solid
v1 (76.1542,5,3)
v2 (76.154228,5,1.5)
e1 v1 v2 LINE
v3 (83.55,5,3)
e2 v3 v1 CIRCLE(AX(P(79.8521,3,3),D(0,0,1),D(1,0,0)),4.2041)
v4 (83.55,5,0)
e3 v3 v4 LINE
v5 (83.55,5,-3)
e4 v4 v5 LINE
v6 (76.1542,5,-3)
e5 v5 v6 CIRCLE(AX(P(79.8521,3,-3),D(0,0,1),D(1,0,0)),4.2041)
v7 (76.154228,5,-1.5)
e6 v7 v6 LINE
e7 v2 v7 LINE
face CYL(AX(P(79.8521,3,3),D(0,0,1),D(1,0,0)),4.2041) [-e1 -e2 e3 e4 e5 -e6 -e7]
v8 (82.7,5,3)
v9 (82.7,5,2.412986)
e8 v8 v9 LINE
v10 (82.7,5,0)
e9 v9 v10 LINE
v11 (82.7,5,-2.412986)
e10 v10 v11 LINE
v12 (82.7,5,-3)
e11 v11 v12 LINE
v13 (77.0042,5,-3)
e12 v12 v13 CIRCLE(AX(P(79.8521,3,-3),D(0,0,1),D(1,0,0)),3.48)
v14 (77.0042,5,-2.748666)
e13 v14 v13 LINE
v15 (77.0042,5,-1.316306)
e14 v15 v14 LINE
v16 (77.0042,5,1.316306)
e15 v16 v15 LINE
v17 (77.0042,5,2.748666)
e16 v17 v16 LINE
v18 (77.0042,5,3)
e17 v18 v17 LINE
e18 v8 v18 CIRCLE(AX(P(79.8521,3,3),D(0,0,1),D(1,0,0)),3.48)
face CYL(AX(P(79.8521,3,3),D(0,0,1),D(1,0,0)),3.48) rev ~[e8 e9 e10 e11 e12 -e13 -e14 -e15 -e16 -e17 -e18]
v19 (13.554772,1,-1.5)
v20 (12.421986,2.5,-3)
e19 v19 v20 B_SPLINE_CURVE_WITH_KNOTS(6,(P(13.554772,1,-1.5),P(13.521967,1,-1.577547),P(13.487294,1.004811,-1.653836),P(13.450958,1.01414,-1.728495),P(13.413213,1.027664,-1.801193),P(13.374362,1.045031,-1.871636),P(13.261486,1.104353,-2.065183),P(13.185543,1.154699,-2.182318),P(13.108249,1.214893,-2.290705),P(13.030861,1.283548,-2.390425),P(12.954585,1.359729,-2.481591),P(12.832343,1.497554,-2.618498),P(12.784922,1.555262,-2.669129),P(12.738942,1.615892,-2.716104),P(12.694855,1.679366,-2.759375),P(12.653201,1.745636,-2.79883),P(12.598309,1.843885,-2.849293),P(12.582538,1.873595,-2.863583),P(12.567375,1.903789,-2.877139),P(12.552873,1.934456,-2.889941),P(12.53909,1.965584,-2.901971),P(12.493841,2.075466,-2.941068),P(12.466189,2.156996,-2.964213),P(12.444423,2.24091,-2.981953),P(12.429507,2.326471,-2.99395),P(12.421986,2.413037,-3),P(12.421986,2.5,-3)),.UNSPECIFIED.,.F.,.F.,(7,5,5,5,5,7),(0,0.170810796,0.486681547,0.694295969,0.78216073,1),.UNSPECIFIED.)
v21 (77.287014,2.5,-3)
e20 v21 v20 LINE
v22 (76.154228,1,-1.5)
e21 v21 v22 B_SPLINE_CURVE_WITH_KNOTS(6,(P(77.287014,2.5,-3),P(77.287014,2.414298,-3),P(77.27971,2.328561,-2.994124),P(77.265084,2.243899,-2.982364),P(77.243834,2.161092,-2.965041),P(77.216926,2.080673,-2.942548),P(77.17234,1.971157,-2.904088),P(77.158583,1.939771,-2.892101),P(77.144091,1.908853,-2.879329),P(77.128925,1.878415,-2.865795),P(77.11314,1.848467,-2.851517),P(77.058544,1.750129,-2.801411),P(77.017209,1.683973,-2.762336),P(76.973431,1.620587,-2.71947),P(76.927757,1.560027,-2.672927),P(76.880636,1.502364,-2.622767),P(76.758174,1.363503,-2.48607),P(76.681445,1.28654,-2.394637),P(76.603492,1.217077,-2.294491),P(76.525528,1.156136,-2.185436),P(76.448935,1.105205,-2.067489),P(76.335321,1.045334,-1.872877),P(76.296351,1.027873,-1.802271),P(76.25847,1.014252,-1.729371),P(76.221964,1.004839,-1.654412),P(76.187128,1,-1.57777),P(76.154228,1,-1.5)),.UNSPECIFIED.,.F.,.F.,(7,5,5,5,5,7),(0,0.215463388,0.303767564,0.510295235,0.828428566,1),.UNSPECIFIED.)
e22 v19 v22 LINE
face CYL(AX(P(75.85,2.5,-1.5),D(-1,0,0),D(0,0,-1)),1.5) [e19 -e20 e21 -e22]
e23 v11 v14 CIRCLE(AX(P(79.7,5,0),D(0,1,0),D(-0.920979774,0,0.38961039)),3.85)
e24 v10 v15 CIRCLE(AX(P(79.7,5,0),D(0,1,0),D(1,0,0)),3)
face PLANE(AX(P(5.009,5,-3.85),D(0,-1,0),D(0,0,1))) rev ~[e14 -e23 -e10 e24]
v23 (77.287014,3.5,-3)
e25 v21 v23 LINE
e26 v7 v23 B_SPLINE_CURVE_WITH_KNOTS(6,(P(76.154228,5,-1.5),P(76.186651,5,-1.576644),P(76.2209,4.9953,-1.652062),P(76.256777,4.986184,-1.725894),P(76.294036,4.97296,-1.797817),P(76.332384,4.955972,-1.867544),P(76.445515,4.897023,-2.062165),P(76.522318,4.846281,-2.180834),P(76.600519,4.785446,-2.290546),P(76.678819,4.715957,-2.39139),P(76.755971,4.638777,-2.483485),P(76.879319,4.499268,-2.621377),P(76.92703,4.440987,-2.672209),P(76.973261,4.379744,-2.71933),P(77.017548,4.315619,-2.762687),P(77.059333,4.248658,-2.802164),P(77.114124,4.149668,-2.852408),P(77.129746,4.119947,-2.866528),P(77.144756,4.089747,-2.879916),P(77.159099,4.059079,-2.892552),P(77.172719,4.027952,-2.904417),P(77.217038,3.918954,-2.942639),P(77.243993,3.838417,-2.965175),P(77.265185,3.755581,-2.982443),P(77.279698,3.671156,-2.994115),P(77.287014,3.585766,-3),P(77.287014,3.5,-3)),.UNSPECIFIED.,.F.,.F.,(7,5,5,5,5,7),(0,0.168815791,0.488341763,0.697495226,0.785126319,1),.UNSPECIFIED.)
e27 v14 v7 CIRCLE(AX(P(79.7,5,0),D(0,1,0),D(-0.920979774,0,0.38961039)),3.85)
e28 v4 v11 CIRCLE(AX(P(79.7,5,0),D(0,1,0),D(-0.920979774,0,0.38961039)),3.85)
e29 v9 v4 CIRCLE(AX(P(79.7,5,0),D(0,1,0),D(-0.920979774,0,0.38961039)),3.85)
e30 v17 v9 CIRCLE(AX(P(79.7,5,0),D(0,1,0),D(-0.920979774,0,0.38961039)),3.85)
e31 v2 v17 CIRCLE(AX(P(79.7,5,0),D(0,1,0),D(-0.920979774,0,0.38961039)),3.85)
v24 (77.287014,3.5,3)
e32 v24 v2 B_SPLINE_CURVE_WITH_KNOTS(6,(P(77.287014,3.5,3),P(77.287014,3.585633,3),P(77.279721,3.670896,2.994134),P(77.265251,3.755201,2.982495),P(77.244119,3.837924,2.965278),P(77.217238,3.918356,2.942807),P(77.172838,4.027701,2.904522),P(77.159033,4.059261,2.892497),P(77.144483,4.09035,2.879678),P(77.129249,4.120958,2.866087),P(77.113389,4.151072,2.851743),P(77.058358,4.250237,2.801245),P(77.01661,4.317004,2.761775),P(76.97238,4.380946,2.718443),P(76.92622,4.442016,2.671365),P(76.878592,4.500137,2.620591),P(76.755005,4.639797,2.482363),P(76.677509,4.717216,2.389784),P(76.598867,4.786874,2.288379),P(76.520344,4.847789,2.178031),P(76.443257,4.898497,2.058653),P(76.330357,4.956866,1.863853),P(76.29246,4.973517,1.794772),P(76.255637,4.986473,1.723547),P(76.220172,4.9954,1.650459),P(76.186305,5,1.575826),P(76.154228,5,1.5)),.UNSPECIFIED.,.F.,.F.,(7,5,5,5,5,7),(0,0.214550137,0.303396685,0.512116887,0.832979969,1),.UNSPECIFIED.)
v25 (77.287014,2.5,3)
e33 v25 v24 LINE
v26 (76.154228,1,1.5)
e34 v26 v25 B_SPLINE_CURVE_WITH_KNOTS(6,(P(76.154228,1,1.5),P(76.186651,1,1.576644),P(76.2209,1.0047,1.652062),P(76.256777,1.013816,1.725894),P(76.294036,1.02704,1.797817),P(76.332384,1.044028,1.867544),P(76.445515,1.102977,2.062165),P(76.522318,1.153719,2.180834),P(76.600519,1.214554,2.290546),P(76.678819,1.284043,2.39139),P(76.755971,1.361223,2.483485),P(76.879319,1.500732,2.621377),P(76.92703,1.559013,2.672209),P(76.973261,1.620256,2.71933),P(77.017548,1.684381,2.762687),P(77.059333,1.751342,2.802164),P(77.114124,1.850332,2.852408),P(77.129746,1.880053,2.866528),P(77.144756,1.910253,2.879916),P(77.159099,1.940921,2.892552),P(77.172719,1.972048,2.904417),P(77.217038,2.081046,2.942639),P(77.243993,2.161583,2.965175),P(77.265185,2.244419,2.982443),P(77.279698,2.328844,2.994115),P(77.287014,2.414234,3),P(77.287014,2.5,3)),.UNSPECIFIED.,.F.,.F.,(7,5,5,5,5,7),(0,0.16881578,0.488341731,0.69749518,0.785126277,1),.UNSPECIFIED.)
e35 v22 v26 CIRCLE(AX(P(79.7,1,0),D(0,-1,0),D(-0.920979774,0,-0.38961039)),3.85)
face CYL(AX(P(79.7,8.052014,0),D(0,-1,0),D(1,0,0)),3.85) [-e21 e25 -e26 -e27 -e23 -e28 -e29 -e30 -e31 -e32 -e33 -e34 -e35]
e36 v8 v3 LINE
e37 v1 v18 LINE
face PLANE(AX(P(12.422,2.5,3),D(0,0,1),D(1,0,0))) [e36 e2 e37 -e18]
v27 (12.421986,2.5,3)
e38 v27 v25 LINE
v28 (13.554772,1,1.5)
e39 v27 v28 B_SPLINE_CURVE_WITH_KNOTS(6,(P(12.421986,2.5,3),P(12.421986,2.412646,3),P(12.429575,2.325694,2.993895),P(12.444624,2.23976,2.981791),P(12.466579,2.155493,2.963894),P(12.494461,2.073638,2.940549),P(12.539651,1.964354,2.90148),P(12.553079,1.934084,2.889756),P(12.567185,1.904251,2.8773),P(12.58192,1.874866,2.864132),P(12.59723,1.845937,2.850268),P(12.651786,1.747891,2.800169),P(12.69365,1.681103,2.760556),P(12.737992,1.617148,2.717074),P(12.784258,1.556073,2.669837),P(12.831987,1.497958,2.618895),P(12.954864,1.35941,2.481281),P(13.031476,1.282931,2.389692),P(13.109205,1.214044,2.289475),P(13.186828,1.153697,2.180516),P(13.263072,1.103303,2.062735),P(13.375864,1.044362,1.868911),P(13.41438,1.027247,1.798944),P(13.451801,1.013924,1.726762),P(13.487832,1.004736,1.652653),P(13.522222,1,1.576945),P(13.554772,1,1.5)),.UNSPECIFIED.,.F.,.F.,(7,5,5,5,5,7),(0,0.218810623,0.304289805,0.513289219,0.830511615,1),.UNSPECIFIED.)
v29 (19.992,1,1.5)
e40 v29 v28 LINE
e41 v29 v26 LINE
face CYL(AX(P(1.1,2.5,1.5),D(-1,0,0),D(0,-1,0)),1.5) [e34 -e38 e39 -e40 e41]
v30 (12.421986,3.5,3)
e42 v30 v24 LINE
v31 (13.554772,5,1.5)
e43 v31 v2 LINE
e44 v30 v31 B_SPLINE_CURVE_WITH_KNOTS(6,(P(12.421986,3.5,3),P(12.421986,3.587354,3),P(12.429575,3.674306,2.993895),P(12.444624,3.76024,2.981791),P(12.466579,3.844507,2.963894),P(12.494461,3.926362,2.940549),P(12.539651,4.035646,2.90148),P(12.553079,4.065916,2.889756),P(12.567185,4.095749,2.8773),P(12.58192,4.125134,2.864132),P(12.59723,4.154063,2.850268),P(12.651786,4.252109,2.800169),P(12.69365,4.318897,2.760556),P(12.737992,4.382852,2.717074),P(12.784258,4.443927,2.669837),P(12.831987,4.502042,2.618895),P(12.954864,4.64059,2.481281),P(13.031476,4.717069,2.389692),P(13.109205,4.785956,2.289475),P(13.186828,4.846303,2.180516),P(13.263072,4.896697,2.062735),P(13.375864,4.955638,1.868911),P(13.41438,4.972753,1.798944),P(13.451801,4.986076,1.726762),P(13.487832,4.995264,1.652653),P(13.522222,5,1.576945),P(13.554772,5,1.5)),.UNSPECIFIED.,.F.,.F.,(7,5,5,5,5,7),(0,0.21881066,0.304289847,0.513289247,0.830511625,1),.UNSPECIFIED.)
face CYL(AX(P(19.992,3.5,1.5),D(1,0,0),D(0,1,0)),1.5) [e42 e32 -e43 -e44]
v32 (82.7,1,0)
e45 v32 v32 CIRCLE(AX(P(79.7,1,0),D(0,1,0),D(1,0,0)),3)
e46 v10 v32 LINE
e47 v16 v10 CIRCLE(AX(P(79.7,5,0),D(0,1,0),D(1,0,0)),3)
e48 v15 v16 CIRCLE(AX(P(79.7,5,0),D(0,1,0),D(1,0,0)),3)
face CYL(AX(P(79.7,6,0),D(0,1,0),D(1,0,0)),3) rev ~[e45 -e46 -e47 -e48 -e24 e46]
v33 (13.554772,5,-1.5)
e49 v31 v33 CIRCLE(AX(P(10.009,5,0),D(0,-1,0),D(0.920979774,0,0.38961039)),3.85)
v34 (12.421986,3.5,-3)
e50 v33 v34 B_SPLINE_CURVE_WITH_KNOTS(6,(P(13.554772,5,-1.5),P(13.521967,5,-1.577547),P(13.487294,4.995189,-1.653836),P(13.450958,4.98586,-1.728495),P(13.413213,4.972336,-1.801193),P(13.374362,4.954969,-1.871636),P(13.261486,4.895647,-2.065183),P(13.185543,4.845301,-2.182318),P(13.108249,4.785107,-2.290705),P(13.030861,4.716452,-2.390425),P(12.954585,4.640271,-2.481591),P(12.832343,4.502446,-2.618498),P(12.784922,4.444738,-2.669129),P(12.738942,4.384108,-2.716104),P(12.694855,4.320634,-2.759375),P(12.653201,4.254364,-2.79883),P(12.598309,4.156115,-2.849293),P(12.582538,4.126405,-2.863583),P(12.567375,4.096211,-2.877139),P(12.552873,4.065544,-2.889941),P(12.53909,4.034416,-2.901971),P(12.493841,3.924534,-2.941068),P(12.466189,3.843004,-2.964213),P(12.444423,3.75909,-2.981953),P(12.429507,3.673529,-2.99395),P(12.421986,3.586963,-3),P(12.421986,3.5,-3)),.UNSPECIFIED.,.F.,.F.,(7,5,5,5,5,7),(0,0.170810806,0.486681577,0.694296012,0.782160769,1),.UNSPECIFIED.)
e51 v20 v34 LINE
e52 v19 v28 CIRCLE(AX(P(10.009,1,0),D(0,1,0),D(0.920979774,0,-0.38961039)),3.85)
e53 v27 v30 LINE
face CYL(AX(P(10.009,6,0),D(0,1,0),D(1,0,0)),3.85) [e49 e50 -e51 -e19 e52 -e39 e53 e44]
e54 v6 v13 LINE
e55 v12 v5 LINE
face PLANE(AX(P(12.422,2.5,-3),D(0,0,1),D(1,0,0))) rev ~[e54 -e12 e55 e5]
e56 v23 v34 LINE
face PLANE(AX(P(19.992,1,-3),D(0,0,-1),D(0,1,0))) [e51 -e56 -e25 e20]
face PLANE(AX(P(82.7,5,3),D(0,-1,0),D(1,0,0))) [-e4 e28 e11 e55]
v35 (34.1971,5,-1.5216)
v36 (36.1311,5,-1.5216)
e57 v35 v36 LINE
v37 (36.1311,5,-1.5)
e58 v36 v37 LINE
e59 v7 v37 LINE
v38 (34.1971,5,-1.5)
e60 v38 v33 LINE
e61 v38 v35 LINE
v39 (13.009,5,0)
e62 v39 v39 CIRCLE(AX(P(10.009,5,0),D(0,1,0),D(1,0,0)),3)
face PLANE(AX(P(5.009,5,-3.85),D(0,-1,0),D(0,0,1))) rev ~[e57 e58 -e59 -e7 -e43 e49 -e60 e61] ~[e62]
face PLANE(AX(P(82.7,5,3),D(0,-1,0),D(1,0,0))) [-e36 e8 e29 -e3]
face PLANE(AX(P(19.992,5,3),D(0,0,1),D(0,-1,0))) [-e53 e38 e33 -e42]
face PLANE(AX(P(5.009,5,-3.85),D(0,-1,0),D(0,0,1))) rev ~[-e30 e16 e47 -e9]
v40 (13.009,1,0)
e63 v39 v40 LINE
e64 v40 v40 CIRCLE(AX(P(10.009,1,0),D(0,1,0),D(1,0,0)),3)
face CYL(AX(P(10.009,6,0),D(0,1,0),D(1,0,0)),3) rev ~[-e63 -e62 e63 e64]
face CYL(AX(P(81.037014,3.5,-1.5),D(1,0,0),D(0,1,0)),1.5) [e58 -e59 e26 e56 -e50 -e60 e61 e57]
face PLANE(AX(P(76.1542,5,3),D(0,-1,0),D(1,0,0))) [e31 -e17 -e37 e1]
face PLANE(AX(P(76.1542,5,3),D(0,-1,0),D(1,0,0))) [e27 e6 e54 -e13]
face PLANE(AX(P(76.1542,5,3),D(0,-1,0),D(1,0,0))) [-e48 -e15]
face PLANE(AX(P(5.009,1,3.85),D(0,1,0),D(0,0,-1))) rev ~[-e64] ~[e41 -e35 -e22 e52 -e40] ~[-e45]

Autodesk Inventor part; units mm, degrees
ref_plane "YZ Plane" through (0, 0, 0) normal (1, 0, 0) x (0, 1, 0)
ref_plane "XZ Plane" through (0, 0, 0) normal (0, 1, 0) x (-1, 0, 0)
ref_plane "XY Plane" through (0, 0, 0) normal (0, 0, 1) x (1, 0, 0)
sketch "Sketch1" plane through (0, 0, 0) normal (0, 1, 0) x (-1, 0, 0)
  point P0 (0, 0)
sketch "Sketch2" plane through (0, 0, 0) normal (0, 1, 0) x (-1, 0, 0)
  circle A0 centre (0, 0) radius 3.85
  dimension "d0" = 7.7
extrude "Extrusion1" add sketch "Sketch2" along normal blind 6
sketch "Sketch3" plane through (0, 6, 0) normal (0, 1, 0) x (1, 0, 0)
  circle A0 centre (0, 0) radius 1
  dimension "d3" = 2
extrude "Extrusion2" cut sketch "Sketch3" against normal through all
sketch "Sketch4" plane through (0, 0, 0) normal (0, -1, 0) x (1, 0, 0)
  circle A0 centre (0, 0) radius 3.85 projected
  line L0 (0, 3.85) -> (3.85, 3.85)
  line L1 (3.85, 3.85) -> (3.85, -3.85)
  line L2 (3.85, -3.85) -> (0, -3.85)
  line L3 (3.85, 3.85) -> (4.85, 3.85)
  line L4 (4.85, 3.85) -> (4.85, -3.85)
  line L5 (4.85, -3.85) -> (3.85, -3.85)
  line L6 (3.85, -3.85) -> (3.85, 3.85)
  line L7 (4.85, 3.85) -> (4.85, 3)
  line L8 (4.85, -3.85) -> (4.85, -3)
  line L9 (4.85, 3) -> (3.85, 3)
  line L10 (3.85, 3) -> (3.85, -3)
  line L11 (3.85, -3) -> (4.85, -3)
  line L12 (4.85, -3) -> (4.85, 3)
  point P0 (3.85, -3)
  dimension "d6" = 1
  dimension "d7" = 0.85
  dimension "d8" = 0.85
extrude "Extrusion3" add sketch "Sketch4" against normal blind 6 contours L1 L9 L4 L11
sketch "Sketch5" plane through (4.85, 0, 3) normal (1, 0, 0) x (0, 0, -1)
  line L0 (6.85, 0) -> (-0.85, 0) projected
  line L1 (6, 0) -> (6, 6) projected
  line L2 (0.0003, 0) -> (6, 0)
  line L3 (6, 0) -> (6, 1)
  line L4 (6, 1) -> (0.0003, 1)
  line L5 (0.0003, 1) -> (0.0003, 0)
  line L6 (6.85, 6) -> (-0.85, 6) projected
  line L7 (0.0003, 6) -> (6, 6)
  line L8 (6, 6) -> (6, 5)
  line L9 (6, 5) -> (0.0003, 5)
  line L10 (0.0003, 5) -> (0.0003, 6)
  point P0 (3, 0)
  point P1 (3, 6)
  dimension "d11" = 1
  dimension "d12" = 1
extrude "Extrusion4" cut sketch "Sketch5" against normal blind 1 contours L9 L10 L6 L1
extrude "Extrusion5" cut sketch "Sketch5" against normal blind 1 contours L0 L5 L4 L1
sketch "Sketch6" plane through (4.85, 5, 2.9997) normal (0, 0, -1) x (-1, 0, 0)
  line L0 (0, 0) -> (1, 0) projected
  line L1 (0, -5) -> (0, 1) projected
  line L2 (1, 0) -> (0, 0)
  line L3 (0, 0) -> (0, 1)
  line L4 (0, 1) -> (1, 1)
  line L5 (1, 1) -> (1, 0)
  line L6 (1, -5) -> (0, -5)
  line L7 (0, -5) -> (0, -3.9916)
  line L8 (0, -3.9916) -> (1, -3.9916)
  line L9 (1, -3.9916) -> (1, -5)
  point P0 (4.85, -5)
extrude "Extrusion6" cut sketch "Sketch6" against normal through all contours L1 L4 L5 L0
extrude "Extrusion7" cut sketch "Sketch6" against normal through all contours L1 L8 L9 L6
sketch "Sketch7" plane through (4.85, 5, 3) normal (1, 0, 0) x (0, 0, -1)
  line L0 (0, 0) -> (3, 0) projected
  line L1 (6, -4) -> (6, 0) projected
  line L2 (0, 0) -> (6, 0)
  line L3 (6, 0) -> (6, -4)
  line L4 (6, -4) -> (0, -4)
  line L5 (0, -4) -> (0, 0)
  point P0 (3, -5)
extrude "Extrusion8" add sketch "Sketch7" along normal blind 71
sketch "Sketch8" plane through (3.85, 1, -3) normal (0, 0, -1) x (-1, 0, 0)
  point P0 (3.85, -1)
sketch "Sketch9" plane through (3.85, 5, 0) normal (0, 1, 0) x (1, 0, 0)
  line L0 (72, 3) -> (72, -3) projected
  line L1 (72, 0) -> (75.85, 0)
  circle A0 centre (75.85, 0) radius 3.85
  point P0 (-3.85, 0)
  dimension "d23" = 3.85
extrude "Extrusion9" add sketch "Sketch9" along normal blind 1
extrude "Extrusion10" add sketch "Sketch9" against normal blind 5
sketch "Sketch10" plane through (79.7, 6, 0) normal (0, 1, 0) x (1, 0, 0)
  circle A0 centre (0, 0) radius 1.85
  point P0 (-79.7, 0)
  dimension "d28" = 3.7
extrude "Extrusion11" cut sketch "Sketch10" against normal through all
sketch "Sketch11" plane through (3.85, 5, 0) normal (-1, 0, 0) x (0, 0, 1)
  point P0 (0, -5)
sketch "Sketch12" plane through (3.85, 5, -3) normal (-1, 0, 0) x (0, 0, 1)
  line L0 (0, 0) -> (3, 0) projected
  line L1 (6, 0) -> (6, -4) projected
  line L2 (0, 0) -> (6, 0)
  line L3 (6, 0) -> (6, -4)
  line L4 (6, -4) -> (0, -4)
  line L5 (0, -4) -> (0, 0)
  point P0 (3, -5)
extrude "Extrusion12" add sketch "Sketch12" along normal blind 2
sketch "Sketch13" plane through (75.85, 5, 3) normal (1, 0, 0) x (0, 0, -1)
  line L0 (3, 0) -> (0, 0) projected
  line L1 (3, -4) -> (6, -4) projected
  line L2 (0, 0) -> (6, 0)
  line L3 (6, 0) -> (6, -4)
  line L4 (6, -4) -> (0, -4)
  line L5 (0, -4) -> (0, 0)
  point P0 (3, -5)
extrude "Extrusion13" add sketch "Sketch13" along normal blind 1.6
fillet "Fillet1" radius 1.5 2 edges at (76.5685, 5, 3) (39.1315, 5, 3)
fillet "Fillet2" radius 1.5 1 edges at (39.85, 5, -3)
fillet "Fillet3" radius 1.5 1 edges at (39.85, 1, -3)
fillet "Fillet4" radius 1.5 3 edges at (4.35, 1, 2.9997) (40.35, 1, 3) (4.85, 1, 2.9998)
sketch "Sketch14" plane through (3.5458, 5, 1.5) normal (0, 1, 0) x (1, 0, 0)
  point P0 (-3.5458, 1.5)
sketch "Sketch15" plane through (3.5458, 5, 1.5) normal (0, 1, 0) x (1, 0, 0)
  line L0 (0.4177, 2.9988) -> (2.9717, 2.9988) construction
  line L1 (2.9717, 2.9988) -> (2.9717, -0.0492) construction
  line L2 (2.9717, -0.0492) -> (0.4177, -0.0492) construction
  line L3 (0.4177, -0.0492) -> (0.4177, 2.9988) construction
  line L4 (0.398, -0.0492) -> (1.4255, 2.9988)
  line L5 (1.4255, 2.9988) -> (1.9244, 2.9988)
  line L6 (1.9244, 2.9988) -> (2.952, -0.0492)
  line L7 (2.952, -0.0492) -> (2.5247, -0.0492)
  line L8 (2.5247, -0.0492) -> (2.248, 0.803)
  line L9 (2.248, 0.803) -> (1.0846, 0.803)
  line L10 (1.0846, 0.803) -> (0.808, -0.0492)
  line L11 (0.808, -0.0492) -> (0.398, -0.0492)
  line L12 (2.1369, 1.1488) -> (1.6651, 2.5839)
  line L13 (1.6651, 2.5839) -> (1.1958, 1.1488)
  line L14 (1.1958, 1.1488) -> (2.1369, 1.1488)
  point P0 (-3.5458, 1.5)
extrude "Extrusion14" add sketch "Sketch15" along normal blind 0.2
sketch "Sketch16" plane through (3.5458, 5, -1.5) normal (0, 1, 0) x (1, 0, 0)
  line L0 (69.8363, -0.0038) -> (72.3064, -0.0038) construction
  line L1 (72.3064, -0.0038) -> (72.3064, -3.0518) construction
  line L2 (72.3064, -3.0518) -> (69.8363, -3.0518) construction
  line L3 (69.8363, -3.0518) -> (69.8363, -0.0038) construction
  spline S0 degree 2 poles (72.2125, -2.1157) (72.2125, -2.3429) (72.0396, -2.6912) (71.8963, -2.8048) knots 0 0 0 1 2 2 2
  spline S1 degree 2 poles (71.8963, -2.8048) (71.7234, -2.9382) (71.3307, -3.0518) (71.0195, -3.0518) knots 0 0 0 1 2 2 2
  line L4 (71.0195, -3.0518) -> (70.1451, -3.0518)
  line L5 (70.1451, -3.0518) -> (70.1451, -0.0038)
  line L6 (70.1451, -0.0038) -> (70.9528, -0.0038)
  spline S2 degree 2 poles (70.9528, -0.0038) (71.2788, -0.0038) (71.6049, -0.0458) (71.7531, -0.1273) knots 0 0 0 1 2 2 2
  spline S3 degree 2 poles (71.7531, -0.1273) (71.9186, -0.2138) (72.0692, -0.4978) (72.0692, -0.6905) knots 0 0 0 1 2 2 2
  spline S4 degree 2 poles (72.0692, -0.6905) (72.0692, -0.9054) (71.842, -1.2462) (71.6419, -1.3426) knots 0 0 0 1 2 2 2
  line L7 (71.6419, -1.3426) -> (71.6419, -1.3574)
  spline S5 degree 2 poles (71.6419, -1.3574) (71.9136, -1.4315) (72.2125, -1.8242) (72.2125, -2.1157) knots 0 0 0 1 2 2 2
  spline S6 degree 2 poles (71.7901, -2.133) (71.7901, -1.9601) (71.6913, -1.7378) (71.5431, -1.6587) knots 0 0 0 1 2 2 2
  spline S7 degree 2 poles (71.5431, -1.6587) (71.4468, -1.6093) (71.2195, -1.5797) (71.0096, -1.5797) knots 0 0 0 1 2 2 2
  line L8 (71.0096, -1.5797) -> (70.5502, -1.5797)
  line L9 (70.5502, -1.5797) -> (70.5502, -2.706)
  line L10 (70.5502, -2.706) -> (70.8787, -2.706)
  spline S8 degree 2 poles (70.8787, -2.706) (71.1454, -2.706) (71.4517, -2.6566) (71.5703, -2.5776) knots 0 0 0 1 2 2 2
  spline S9 degree 2 poles (71.5703, -2.5776) (71.6839, -2.4961) (71.7901, -2.2935) (71.7901, -2.133) knots 0 0 0 1 2 2 2
  spline S10 degree 2 poles (71.6469, -0.7473) (71.6469, -0.6386) (71.5728, -0.4756) (71.4912, -0.4287) knots 0 0 0 1 2 2 2
  spline S11 degree 2 poles (71.4912, -0.4287) (71.3924, -0.3743) (71.1529, -0.3496) (70.938, -0.3496) knots 0 0 0 1 2 2 2
  line L11 (70.938, -0.3496) -> (70.5502, -0.3496)
  line L12 (70.5502, -0.3496) -> (70.5502, -1.2413)
  line L13 (70.5502, -1.2413) -> (71.0096, -1.2413)
  spline S12 degree 2 poles (71.0096, -1.2413) (71.1998, -1.2413) (71.3801, -1.2018) (71.4764, -1.14) knots 0 0 0 1 2 2 2
  spline S13 degree 2 poles (71.4764, -1.14) (71.5703, -1.0807) (71.6469, -0.8905) (71.6469, -0.7473) knots 0 0 0 1 2 2 2
  point P0 (-3.5458, -1.5)
extrude "Extrusion15" add sketch "Sketch16" along normal blind 0.2
sketch "Sketch17" plane through (3.5458, 5, -1.5) normal (0, 1, 0) x (1, 0, 0)
  line L0 (0.4145, -1.5) -> (36.4145, -1.5)
  line L1 (30.4487, 0.0859) -> (55.6072, 0.0859) construction
  line L2 (55.6072, 0.0859) -> (55.6072, -2.5363) construction
  line L3 (55.6072, -2.5363) -> (30.4487, -2.5363) construction
  line L4 (30.4487, -2.5363) -> (30.4487, 0.0859) construction
  line L5 (32.5853, -0.4353) -> (31.2663, -3.0264)
  line L6 (31.2663, -3.0264) -> (30.8316, -3.0264)
  line L7 (30.8316, -3.0264) -> (32.2247, -0.3365)
  line L8 (32.2247, -0.3365) -> (30.6513, -0.3365)
  line L9 (30.6513, -0.3365) -> (30.6513, 0.0216)
  line L10 (30.6513, 0.0216) -> (32.5853, 0.0216)
  line L11 (32.5853, 0.0216) -> (32.5853, -0.4353)
  line L12 (34.838, -3.0264) -> (32.9583, -3.0264)
  line L13 (32.9583, -3.0264) -> (32.9583, -2.5941)
  spline S0 degree 2 poles (32.9583, -2.5941) (33.1608, -2.4039) (33.5214, -2.0507) (33.6943, -1.8605) knots 0 0 0 1 2 2 2
  spline S1 degree 2 poles (33.6943, -1.8605) (34.0426, -1.4777) (34.297, -1.0182) (34.297, -0.7737) knots 0 0 0 1 2 2 2
  spline S2 degree 2 poles (34.297, -0.7737) (34.297, -0.6453) (34.218, -0.4526) (34.1464, -0.3909) knots 0 0 0 1 2 2 2
  spline S3 degree 2 poles (34.1464, -0.3909) (34.0747, -0.3291) (33.887, -0.2674) (33.7734, -0.2674) knots 0 0 0 1 2 2 2
  spline S4 degree 2 poles (33.7734, -0.2674) (33.6647, -0.2674) (33.4424, -0.3217) (33.3411, -0.3637) knots 0 0 0 1 2 2 2
  spline S5 degree 2 poles (33.3411, -0.3637) (33.2547, -0.3983) (33.0941, -0.4971) (33.0447, -0.5317) knots 0 0 0 1 2 2 2
  line L14 (33.0447, -0.5317) -> (33.0225, -0.5317)
  line L15 (33.0225, -0.5317) -> (33.0225, -0.0969)
  spline S6 degree 2 poles (33.0225, -0.0969) (33.1485, -0.0352) (33.6005, 0.0859) (33.803, 0.0859) knots 0 0 0 1 2 2 2
  spline S7 degree 2 poles (33.803, 0.0859) (34.2303, 0.0859) (34.712, -0.3662) (34.712, -0.7515) knots 0 0 0 1 2 2 2
  spline S8 degree 2 poles (34.712, -0.7515) (34.712, -0.9318) (34.628, -1.2331) (34.5539, -1.3616) knots 0 0 0 1 2 2 2
  spline S9 degree 2 poles (34.5539, -1.3616) (34.4798, -1.495) (34.2649, -1.7568) (34.1464, -1.8828) knots 0 0 0 1 2 2 2
  spline S10 degree 2 poles (34.1464, -1.8828) (33.9537, -2.0927) (33.4819, -2.5422) (33.3411, -2.6732) knots 0 0 0 1 2 2 2
  line L16 (33.3411, -2.6732) -> (34.838, -2.6732)
  line L17 (34.838, -2.6732) -> (34.838, -3.0264)
  line L18 (37.8958, -3.0264) -> (37.8958, -1.7024)
  spline S11 degree 2 poles (37.8958, -1.7024) (37.8958, -1.5444) (37.8711, -1.2751) (37.8316, -1.201) knots 0 0 0 1 2 2 2
  spline S12 degree 2 poles (37.8316, -1.201) (37.7921, -1.1195) (37.6414, -1.0405) (37.5105, -1.0405) knots 0 0 0 1 2 2 2
  spline S13 degree 2 poles (37.5105, -1.0405) (37.392, -1.0405) (37.1203, -1.1862) (36.977, -1.3245) knots 0 0 0 1 2 2 2
  spline S14 degree 2 poles (36.977, -1.3245) (36.9795, -1.3591) (36.9844, -1.4554) (36.9844, -1.5197) knots 0 0 0 1 2 2 2
  line L19 (36.9844, -1.5197) -> (36.9844, -3.0264)
  line L20 (36.9844, -3.0264) -> (36.5991, -3.0264)
  line L21 (36.5991, -3.0264) -> (36.5991, -1.7024)
  spline S15 degree 2 poles (36.5991, -1.7024) (36.5991, -1.5444) (36.5744, -1.2751) (36.5349, -1.201) knots 0 0 0 1 2 2 2
  spline S16 degree 2 poles (36.5349, -1.201) (36.4953, -1.1195) (36.3447, -1.0405) (36.2138, -1.0405) knots 0 0 0 1 2 2 2
  spline S17 degree 2 poles (36.2138, -1.0405) (36.0903, -1.0405) (35.8161, -1.1961) (35.6876, -1.3171) knots 0 0 0 1 2 2 2
  line L22 (35.6876, -1.3171) -> (35.6876, -3.0264)
  line L23 (35.6876, -3.0264) -> (35.3023, -3.0264)
  line L24 (35.3023, -3.0264) -> (35.3023, -0.7391)
  line L25 (35.3023, -0.7391) -> (35.6876, -0.7391)
  line L26 (35.6876, -0.7391) -> (35.6876, -0.9911)
  spline S18 degree 2 poles (35.6876, -0.9911) (35.8383, -0.8404) (36.1347, -0.6749) (36.3126, -0.6749) knots 0 0 0 1 2 2 2
  spline S19 degree 2 poles (36.3126, -0.6749) (36.5151, -0.6749) (36.8288, -0.8602) (36.9103, -1.0701) knots 0 0 0 1 2 2 2
  spline S20 degree 2 poles (36.9103, -1.0701) (37.0857, -0.875) (37.4167, -0.6749) (37.6093, -0.6749) knots 0 0 0 1 2 2 2
  spline S21 degree 2 poles (37.6093, -0.6749) (37.7575, -0.6749) (37.9996, -0.7663) (38.0885, -0.87) knots 0 0 0 1 2 2 2
  spline S22 degree 2 poles (38.0885, -0.87) (38.1799, -0.9738) (38.2812, -1.285) (38.2812, -1.5197) knots 0 0 0 1 2 2 2
  line L27 (38.2812, -1.5197) -> (38.2812, -3.0264)
  line L28 (38.2812, -3.0264) -> (37.8958, -3.0264)
  line L29 (41.4156, -3.0264) -> (41.4156, -1.7024)
  spline S23 degree 2 poles (41.4156, -1.7024) (41.4156, -1.5444) (41.3909, -1.2751) (41.3514, -1.201) knots 0 0 0 1 2 2 2
  spline S24 degree 2 poles (41.3514, -1.201) (41.3119, -1.1195) (41.1612, -1.0405) (41.0303, -1.0405) knots 0 0 0 1 2 2 2
  spline S25 degree 2 poles (41.0303, -1.0405) (40.9117, -1.0405) (40.64, -1.1862) (40.4968, -1.3245) knots 0 0 0 1 2 2 2
  spline S26 degree 2 poles (40.4968, -1.3245) (40.4992, -1.3591) (40.5042, -1.4554) (40.5042, -1.5197) knots 0 0 0 1 2 2 2
  line L30 (40.5042, -1.5197) -> (40.5042, -3.0264)
  line L31 (40.5042, -3.0264) -> (40.1189, -3.0264)
  line L32 (40.1189, -3.0264) -> (40.1189, -1.7024)
  spline S27 degree 2 poles (40.1189, -1.7024) (40.1189, -1.5444) (40.0942, -1.2751) (40.0546, -1.201) knots 0 0 0 1 2 2 2
  spline S28 degree 2 poles (40.0546, -1.201) (40.0151, -1.1195) (39.8644, -1.0405) (39.7335, -1.0405) knots 0 0 0 1 2 2 2
  spline S29 degree 2 poles (39.7335, -1.0405) (39.61, -1.0405) (39.3359, -1.1961) (39.2074, -1.3171) knots 0 0 0 1 2 2 2
  line L33 (39.2074, -1.3171) -> (39.2074, -3.0264)
  line L34 (39.2074, -3.0264) -> (38.8221, -3.0264)
  line L35 (38.8221, -3.0264) -> (38.8221, -0.7391)
  line L36 (38.8221, -0.7391) -> (39.2074, -0.7391)
  line L37 (39.2074, -0.7391) -> (39.2074, -0.9911)
  spline S30 degree 2 poles (39.2074, -0.9911) (39.3581, -0.8404) (39.6545, -0.6749) (39.8323, -0.6749) knots 0 0 0 1 2 2 2
  spline S31 degree 2 poles (39.8323, -0.6749) (40.0349, -0.6749) (40.3486, -0.8602) (40.4301, -1.0701) knots 0 0 0 1 2 2 2
  spline S32 degree 2 poles (40.4301, -1.0701) (40.6054, -0.875) (40.9364, -0.6749) (41.1291, -0.6749) knots 0 0 0 1 2 2 2
  spline S33 degree 2 poles (41.1291, -0.6749) (41.2773, -0.6749) (41.5194, -0.7663) (41.6083, -0.87) knots 0 0 0 1 2 2 2
  spline S34 degree 2 poles (41.6083, -0.87) (41.6997, -0.9738) (41.8009, -1.285) (41.8009, -1.5197) knots 0 0 0 1 2 2 2
  line L38 (41.8009, -1.5197) -> (41.8009, -3.0264)
  line L39 (41.8009, -3.0264) -> (41.4156, -3.0264)
  point P0 (-3.5458, -1.5)
  dimension "d43" = 36
extrude "Extrusion16" add sketch "Sketch17" along normal blind 0.2
sketch "Sketch18" plane through (3.5458, 5.2, -1.5) normal (0, 1, 0) x (1, 0, 0)
  line L0 (29.8828, 2.0952) -> (43.3392, 2.0952)
  line L1 (43.3392, 2.0952) -> (43.3392, -5.5663)
  line L2 (43.3392, -5.5663) -> (29.8828, -5.5663)
  line L3 (29.8828, -5.5663) -> (29.8828, 2.0952)
  point P0 (-3.5458, -1.5)
extrude "Extrusion17" cut sketch "Sketch18" against normal blind 0.2
sketch "Sketch19" plane through (3.5458, 5.2, 1.5) normal (0, 1, 0) x (1, 0, 0)
  line L0 (0.3624, -0.1736) -> (3.3783, -0.1736)
  line L1 (3.3783, -0.1736) -> (3.3783, 3.2897)
  line L2 (3.3783, 3.2897) -> (0.3624, 3.2897)
  line L3 (0.3624, 3.2897) -> (0.3624, -0.1736)
  line L4 (72.2697, -0.5369) -> (69.8008, -0.5369)
  line L5 (69.8008, -0.5369) -> (69.8008, 3.7021)
  line L6 (69.8008, 3.7021) -> (72.2697, 3.7021)
  line L7 (72.2697, 3.7021) -> (72.2697, -0.5369)
  point P0 (-3.5458, 1.5)
extrude "Extrusion18" cut sketch "Sketch19" against normal blind 0.2 contours L3 L2 L1 L0
extrude "Extrusion19" cut sketch "Sketch19" against normal blind 0.2 contours L4 L5 L6 L7
sketch "Sketch20" plane through (79.7, 0, 0) normal (0, -1, 0) x (1, 0, 0)
  point P0 (-79.7, 0)
sketch "Sketch21" plane through (79.7, 6, 0) normal (0, 1, 0) x (1, 0, 0)
  circle A0 centre (0, 0) radius 1.95
  point P0 (-79.7, 0)
  dimension "d52" = 3.9
extrude "Extrusion20" cut sketch "Sketch21" against normal through all
sketch "Sketch22" plane through (0, 6, 0) normal (0, 1, 0) x (1, 0, 0)
  line L0 (0, 0) -> (0, -3.85)
  circle A0 centre (0, 0) radius 3.85 projected
  line L1 (0, -3.85) -> (3.85, -3.85)
  line L2 (3.85, -3.85) -> (-3.85, -3.85)
  line L3 (-3.85, -3.85) -> (-3.85, 3.85)
  line L4 (-3.85, 3.85) -> (3.85, 3.85)
  line L5 (3.85, 3.85) -> (3.85, -3.85)
extrude "Extrusion21" cut sketch "Sketch22" against normal through all contours A0
sketch "Sketch23" plane through (79.7, 5, 0) normal (0, 1, 0) x (1, 0, 0)
  arc A0 (-76.1542, -1.5) -> (-76.1542, 1.5) centre (-79.7, 0) ccw projected
  line L0 (-75.85, 0) -> (-77.9753, 0)
  line L1 (-77.9753, 0) -> (-77.9753, 3.5992)
  line L2 (-77.9753, 3.5992) -> (-75.85, 3.5992)
  line L3 (-75.85, 3.5992) -> (-75.85, 0)
  line L4 (-75.85, 0) -> (-77.9753, 0)
  line L5 (-77.9753, 0) -> (-77.9753, -3.4561)
  line L6 (-77.9753, -3.4561) -> (-75.85, -3.4561)
  line L7 (-75.85, -3.4561) -> (-75.85, 0)
  line L8 (-75.85, -3.4561) -> (-65.85, -3.4561)
  line L9 (-65.85, -3.4561) -> (-65.85, 3.5992)
  line L10 (-65.85, 3.5992) -> (-75.85, 3.5992)
  line L11 (-75.85, 3.5992) -> (-75.85, -3.4561)
  dimension "d57" = 10
extrude "Extrusion22" cut sketch "Sketch23" against normal through all contours L3 L10 L9 L8 L7
extrude "Extrusion23" cut sketch "Sketch23" against normal through all contours L7 L6 L5 L0
extrude "Extrusion24" cut sketch "Sketch23" against normal through all contours L0 L1 L2 L3
sketch "Sketch24" plane through (13.85, 5, -1.5) normal (-1, 0, 0) x (0, 0, 1)
  line L0 (-2.9013, -5) -> (5.7799, -5)
  line L1 (5.7799, -5) -> (5.7799, 1.344)
  line L2 (5.7799, 1.344) -> (-2.9013, 1.344)
  line L3 (-2.9013, 1.344) -> (-2.9013, -5)
  point P0 (1.5, -5)
extrude "Extrusion25" cut sketch "Sketch24" against normal blind 6.142
sketch "Sketch25" plane through (19.992, 5, -1.5) normal (-1, 0, 0) x (0, 0, 1)
  line L0 (-1.5, 0) -> (4.5, 0)
  line L1 (4.5, 0) -> (4.5, -4)
  line L2 (4.5, -4) -> (-1.5, -4)
  line L3 (-1.5, -4) -> (-1.5, 0)
  point P0 (1.5, -5)
  dimension "d66" = 6
  dimension "d67" = 4
extrude "Extrusion26" add sketch "Sketch25" along normal blind 6.133
sketch "Sketch26" plane through (79.7, 6, 0) normal (0, 1, 0) x (1, 0, 0)
  line L0 (-65.841, -3) -> (-65.841, 3) projected
  line L1 (-65.841, 0) -> (-69.691, 0)
  circle A0 centre (-69.691, 0) radius 3.85
  point P0 (-79.7, 0)
  dimension "d70" = 3.85
extrude "Extrusion27" add sketch "Sketch26" against normal blind 6
sketch "Sketch27" plane through (13.859, 5, -1.5) normal (-1, 0, 0) x (0, 0, 1)
  point P0 (1.5, -5)
sketch "Sketch28" plane through (13.859, 5, -1.5) normal (-1, 0, 0) x (0, 0, 1)
  line L0 (-1.5, 0) -> (-1.5, -4) projected
  line L1 (4.5, 0) -> (3, 0) projected
  line L2 (-1.5, -4) -> (4.5, -4)
  line L3 (4.5, -4) -> (4.5, 0)
  line L4 (4.5, 0) -> (-1.5, 0)
  line L5 (-1.5, 0) -> (-1.5, -4)
  point P0 (1.5, -5)
extrude "Extrusion28" add sketch "Sketch28" along normal blind 5
sketch "Sketch29" plane through (19.992, 3.5, 3) normal (0, 0, 1) x (1, 0, 0)
  point P0 (-19.992, -3.5)
sketch "Sketch30" plane through (79.7, 5, 0) normal (0, 1, 0) x (1, 0, 0)
  point P0 (-79.7, 0)
sketch "Sketch31" plane through (19.992, 5, -1.5) normal (1, 0, 0) x (0, 0, -1)
  arc A0 (-3, 0) -> (-4.5, -1.5) centre (-3, -1.5) ccw projected
  circle A1 centre (-3, -1.5) radius 1.5
  circle A2 centre (-3, -1.5) radius 1.5
  arc A3 (-4.5, -2.5) -> (-3, -4) centre (-3, -2.5) ccw projected
  circle A4 centre (-3, -2.5) radius 1.5
  arc A5 (0, -4) -> (1.5, -2.5) centre (0, -2.5) ccw projected
  circle A6 centre (0, -2.5) radius 1.5
  arc A7 (1.5, -1.5) -> (0, 0) centre (0, -1.5) ccw projected
  circle A8 centre (0, -1.5) radius 1.5
  line L0 (-4.5, -1.5) -> (-4.5, 0) projected
  line L1 (-4.5, 0) -> (-3, 0)
  line L2 (-3, 0) -> (-3, -1.5)
  line L3 (-3, -1.5) -> (-4.5, -1.5)
  line L4 (-4.5, -1.5) -> (-4.5, 0)
  line L5 (0, 0) -> (1.5, 0)
  line L6 (1.5, 0) -> (1.5, -1.5)
  line L7 (1.5, -1.5) -> (0, -1.5)
  line L8 (0, -1.5) -> (0, 0)
  line L9 (-3, -4) -> (-4.5, -4)
  line L10 (-4.5, -4) -> (-4.5, -2.5)
  line L11 (-4.5, -2.5) -> (-3, -2.5)
  line L12 (-3, -2.5) -> (-3, -4)
  line L13 (0, -4) -> (1.5, -4)
  line L14 (1.5, -4) -> (1.5, -2.5)
  line L15 (1.5, -2.5) -> (0, -2.5)
  line L16 (0, -2.5) -> (0, -4)
  point P0 (-1.5, -5)
extrude "Extrusion29" cut sketch "Sketch31" against normal blind 10 contours A0 L0 L1
extrude "Extrusion30" cut sketch "Sketch31" against normal blind 10 contours A3 L9 L10
extrude "Extrusion31" cut sketch "Sketch31" against normal blind 10 contours A5 L14 L13
extrude "Extrusion32" cut sketch "Sketch31" against normal blind 10 contours L5 L6 A7
sketch "Sketch32" plane through (79.7, 6, 0) normal (0, 1, 0) x (1, 0, 0)
  point P0 (-79.7, 0)
sketch "Sketch33" plane through (10.009, 6, 0) normal (0, 1, 0) x (1, 0, 0)
  circle A0 centre (0, 0) radius 3.85
  point P0 (-10.009, 0)
extrude "Extrusion33" add sketch "Sketch33" against normal blind 6
sketch "Sketch34" plane through (10.009, 6, 0) normal (0, 1, 0) x (1, 0, 0)
  circle A0 centre (0, 0) radius 1.925
  point P0 (-10.009, 0)
  dimension "d85" = 3.85
extrude "Extrusion34" cut sketch "Sketch34" against normal blind 6
sketch "Sketch35" plane through (10.009, 6, 0) normal (0, 1, 0) x (1, 0, 0)
  point P0 (-10.009, 0)
sketch "Sketch36" plane through (79.7, 6, 0) normal (0, 1, 0) x (1, 0, 0)
  point P0 (-79.7, 0)
sketch "Sketch37" plane through (79.7, 6, 0) normal (0, 1, 0) x (1, 0, 0)
  point P0 (-79.7, 0)
sketch "Sketch38" plane through (10.009, 6, 0) normal (0, 1, 0) x (1, 0, 0)
  circle A0 centre (0, 0) radius 1.95
  point P0 (-10.009, 0)
  dimension "d89" = 3.9
extrude "Extrusion35" cut sketch "Sketch38" against normal blind 6
sketch "Sketch39" plane through (79.7, 6, 0) normal (0, 1, 0) x (1, 0, 0)
  point P0 (-79.7, 0)
sketch "Sketch40" plane through (79.7, 6, 0) normal (0, 1, 0) x (1, 0, 0)
  point P0 (-79.7, 0)
sketch "Sketch41" plane through (79.7, 6, 0) normal (0, 1, 0) x (1, 0, 0)
  point P0 (-79.7, 0)
sketch "Sketch42" plane through (79.7, 6, 0) normal (0, 1, 0) x (1, 0, 0)
  circle A0 centre (0, 0) radius 3
  arc A1 (-66.1452, -1.5) -> (-66.1452, 1.5) centre (-69.691, 0) ccw projected
  circle A2 centre (-69.691, 0) radius 3
  point P0 (-79.7, 0)
  dimension "d92" = 6
  dimension "d93" = 6
extrude "Extrusion36" cut sketch "Sketch42" against normal through all contours A0
extrude "Extrusion37" cut sketch "Sketch42" against normal through all contours A2
sketch "Sketch43" plane through (10.009, 0, 0) normal (0, -1, 0) x (1, 0, 0)
  circle A0 centre (0, 0) radius 3.85 projected
  line L0 (0, 3.85) -> (-5, 3.85)
  line L1 (-5, 3.85) -> (-5, -3.85)
  line L2 (-5, -3.85) -> (0, -3.85)
  line L3 (0, -3.85) -> (0, 3.85)
  line L4 (-5, 3.85) -> (-4.5, 3.85)
  line L5 (-4.5, 3.85) -> (-4.5, -3.85)
  line L6 (-4.5, -3.85) -> (-5, -3.85)
  line L7 (-5, -3.85) -> (-5, 3.85)
  point P0 (-10.009, 0)
  dimension "d98" = 5
  dimension "d99" = 0.5
extrude "Extrusion38" add sketch "Sketch43" against normal blind 1 contours L5 L2 L1 L0
sketch "Sketch44" plane through (5.009, 0, -3.85) normal (-1, 0, 0) x (0, 0, 1)
  point P0 (3.85, 0)
sketch "Sketch45" plane through (5.009, 0, -3.85) normal (-1, 0, 0) x (0, 0, 1)
  line L0 (7.7, 1) -> (0, 1) projected
  line L1 (0, 0) -> (7.7, 0) projected
  line L2 (0, 1) -> (7.7, 1)
  line L3 (7.7, 1) -> (7.7, 0)
  line L4 (7.7, 0) -> (0, 0)
  line L5 (0, 0) -> (0, 1)
  point P0 (3.85, 0)
extrude "Extrusion39" cut sketch "Sketch45" against normal through all
sketch "Sketch46" plane through (10.009, 6, 0) normal (0, 1, 0) x (1, 0, 0)
  circle A0 centre (0, 0) radius 3.85 projected
  line L0 (0, 3.85) -> (-5, 3.85)
  line L1 (-5, 3.85) -> (-5, -3.85)
  line L2 (-5, -3.85) -> (0, -3.85)
  line L3 (0, -3.85) -> (0, 3.85)
  line L4 (-5, 3.85) -> (-4.5, 3.85)
  line L5 (-4.5, 3.85) -> (-4.5, -3.85)
  line L6 (-4.5, -3.85) -> (-5, -3.85)
  line L7 (-5, -3.85) -> (-5, 3.85)
  point P0 (-10.009, 0)
  dimension "d104" = 5
  dimension "d105" = 0.5
extrude "Extrusion40" add sketch "Sketch46" against normal blind 1 contours L5 L2 L1 L0
sketch "Sketch47" plane through (5.009, 6, -3.85) normal (-1, 0, 0) x (0, 0, 1)
  line L0 (0, 0) -> (0, -1) projected
  line L1 (0, -1) -> (7.7, -1) projected
  line L2 (0, 0) -> (7.7, 0)
  line L3 (7.7, 0) -> (7.7, -1)
  line L4 (7.7, -1) -> (0, -1)
  line L5 (0, -1) -> (0, 0)
  point P0 (3.85, -6)
extrude "Extrusion41" cut sketch "Sketch47" against normal through all
sketch "Sketch48" plane through (12.422, 2.5, 3) normal (0, 0, 1) x (1, 0, 0)
  line L0 (1.1328, 2.5) -> (63.7322, 2.5) projected
  line L1 (1.1328, -1.5) -> (63.7322, -1.5) projected
  line L2 (63.7322, 2.5) -> (63.7322, -1.5)
  line L3 (63.7322, 2.5) -> (71.128, 2.5) projected
  line L4 (71.128, 2.5) -> (63.7322, -1.5)
  line L5 (63.7322, 2.5) -> (71.128, -1.5)
  line L6 (71.128, -1.5) -> (71.128, 2.5) projected
  circle A0 centre (67.4301, 0.5) radius 4.2041
  line L7 (67.4301, 0.5) -> (67.4301, -1.5)
  line L8 (64.278, -1.5) -> (70.278, -1.5) projected
  line L9 (70.278, 2.5) -> (70.278, -1.5) projected
  line L10 (71.128, 0.6263) -> (70.278, 0.6263)
  line L11 (63.7322, 0.5) -> (64.5822, 0.5)
  line L12 (64.5822, 2.5) -> (64.5822, -1.5)
  line L13 (70.278, 2.5) -> (70.278, -1.5)
  line L14 (64.5822, 2.5) -> (70.278, -1.5)
  line L15 (70.278, 2.5) -> (64.5822, -1.5)
  circle A1 centre (67.4301, 0.5) radius 3.48
  line L16 (63.7322, 2.5) -> (71.128, 2.5)
  point P0 (-12.422, -2.5)
  dimension "d110" = 4
  dimension "d111" = 0.85
extrude "Extrusion42" add sketch "Sketch48" against normal blind 6 contours A0 L3 A1
properties part number "Part3_3DPrint"
